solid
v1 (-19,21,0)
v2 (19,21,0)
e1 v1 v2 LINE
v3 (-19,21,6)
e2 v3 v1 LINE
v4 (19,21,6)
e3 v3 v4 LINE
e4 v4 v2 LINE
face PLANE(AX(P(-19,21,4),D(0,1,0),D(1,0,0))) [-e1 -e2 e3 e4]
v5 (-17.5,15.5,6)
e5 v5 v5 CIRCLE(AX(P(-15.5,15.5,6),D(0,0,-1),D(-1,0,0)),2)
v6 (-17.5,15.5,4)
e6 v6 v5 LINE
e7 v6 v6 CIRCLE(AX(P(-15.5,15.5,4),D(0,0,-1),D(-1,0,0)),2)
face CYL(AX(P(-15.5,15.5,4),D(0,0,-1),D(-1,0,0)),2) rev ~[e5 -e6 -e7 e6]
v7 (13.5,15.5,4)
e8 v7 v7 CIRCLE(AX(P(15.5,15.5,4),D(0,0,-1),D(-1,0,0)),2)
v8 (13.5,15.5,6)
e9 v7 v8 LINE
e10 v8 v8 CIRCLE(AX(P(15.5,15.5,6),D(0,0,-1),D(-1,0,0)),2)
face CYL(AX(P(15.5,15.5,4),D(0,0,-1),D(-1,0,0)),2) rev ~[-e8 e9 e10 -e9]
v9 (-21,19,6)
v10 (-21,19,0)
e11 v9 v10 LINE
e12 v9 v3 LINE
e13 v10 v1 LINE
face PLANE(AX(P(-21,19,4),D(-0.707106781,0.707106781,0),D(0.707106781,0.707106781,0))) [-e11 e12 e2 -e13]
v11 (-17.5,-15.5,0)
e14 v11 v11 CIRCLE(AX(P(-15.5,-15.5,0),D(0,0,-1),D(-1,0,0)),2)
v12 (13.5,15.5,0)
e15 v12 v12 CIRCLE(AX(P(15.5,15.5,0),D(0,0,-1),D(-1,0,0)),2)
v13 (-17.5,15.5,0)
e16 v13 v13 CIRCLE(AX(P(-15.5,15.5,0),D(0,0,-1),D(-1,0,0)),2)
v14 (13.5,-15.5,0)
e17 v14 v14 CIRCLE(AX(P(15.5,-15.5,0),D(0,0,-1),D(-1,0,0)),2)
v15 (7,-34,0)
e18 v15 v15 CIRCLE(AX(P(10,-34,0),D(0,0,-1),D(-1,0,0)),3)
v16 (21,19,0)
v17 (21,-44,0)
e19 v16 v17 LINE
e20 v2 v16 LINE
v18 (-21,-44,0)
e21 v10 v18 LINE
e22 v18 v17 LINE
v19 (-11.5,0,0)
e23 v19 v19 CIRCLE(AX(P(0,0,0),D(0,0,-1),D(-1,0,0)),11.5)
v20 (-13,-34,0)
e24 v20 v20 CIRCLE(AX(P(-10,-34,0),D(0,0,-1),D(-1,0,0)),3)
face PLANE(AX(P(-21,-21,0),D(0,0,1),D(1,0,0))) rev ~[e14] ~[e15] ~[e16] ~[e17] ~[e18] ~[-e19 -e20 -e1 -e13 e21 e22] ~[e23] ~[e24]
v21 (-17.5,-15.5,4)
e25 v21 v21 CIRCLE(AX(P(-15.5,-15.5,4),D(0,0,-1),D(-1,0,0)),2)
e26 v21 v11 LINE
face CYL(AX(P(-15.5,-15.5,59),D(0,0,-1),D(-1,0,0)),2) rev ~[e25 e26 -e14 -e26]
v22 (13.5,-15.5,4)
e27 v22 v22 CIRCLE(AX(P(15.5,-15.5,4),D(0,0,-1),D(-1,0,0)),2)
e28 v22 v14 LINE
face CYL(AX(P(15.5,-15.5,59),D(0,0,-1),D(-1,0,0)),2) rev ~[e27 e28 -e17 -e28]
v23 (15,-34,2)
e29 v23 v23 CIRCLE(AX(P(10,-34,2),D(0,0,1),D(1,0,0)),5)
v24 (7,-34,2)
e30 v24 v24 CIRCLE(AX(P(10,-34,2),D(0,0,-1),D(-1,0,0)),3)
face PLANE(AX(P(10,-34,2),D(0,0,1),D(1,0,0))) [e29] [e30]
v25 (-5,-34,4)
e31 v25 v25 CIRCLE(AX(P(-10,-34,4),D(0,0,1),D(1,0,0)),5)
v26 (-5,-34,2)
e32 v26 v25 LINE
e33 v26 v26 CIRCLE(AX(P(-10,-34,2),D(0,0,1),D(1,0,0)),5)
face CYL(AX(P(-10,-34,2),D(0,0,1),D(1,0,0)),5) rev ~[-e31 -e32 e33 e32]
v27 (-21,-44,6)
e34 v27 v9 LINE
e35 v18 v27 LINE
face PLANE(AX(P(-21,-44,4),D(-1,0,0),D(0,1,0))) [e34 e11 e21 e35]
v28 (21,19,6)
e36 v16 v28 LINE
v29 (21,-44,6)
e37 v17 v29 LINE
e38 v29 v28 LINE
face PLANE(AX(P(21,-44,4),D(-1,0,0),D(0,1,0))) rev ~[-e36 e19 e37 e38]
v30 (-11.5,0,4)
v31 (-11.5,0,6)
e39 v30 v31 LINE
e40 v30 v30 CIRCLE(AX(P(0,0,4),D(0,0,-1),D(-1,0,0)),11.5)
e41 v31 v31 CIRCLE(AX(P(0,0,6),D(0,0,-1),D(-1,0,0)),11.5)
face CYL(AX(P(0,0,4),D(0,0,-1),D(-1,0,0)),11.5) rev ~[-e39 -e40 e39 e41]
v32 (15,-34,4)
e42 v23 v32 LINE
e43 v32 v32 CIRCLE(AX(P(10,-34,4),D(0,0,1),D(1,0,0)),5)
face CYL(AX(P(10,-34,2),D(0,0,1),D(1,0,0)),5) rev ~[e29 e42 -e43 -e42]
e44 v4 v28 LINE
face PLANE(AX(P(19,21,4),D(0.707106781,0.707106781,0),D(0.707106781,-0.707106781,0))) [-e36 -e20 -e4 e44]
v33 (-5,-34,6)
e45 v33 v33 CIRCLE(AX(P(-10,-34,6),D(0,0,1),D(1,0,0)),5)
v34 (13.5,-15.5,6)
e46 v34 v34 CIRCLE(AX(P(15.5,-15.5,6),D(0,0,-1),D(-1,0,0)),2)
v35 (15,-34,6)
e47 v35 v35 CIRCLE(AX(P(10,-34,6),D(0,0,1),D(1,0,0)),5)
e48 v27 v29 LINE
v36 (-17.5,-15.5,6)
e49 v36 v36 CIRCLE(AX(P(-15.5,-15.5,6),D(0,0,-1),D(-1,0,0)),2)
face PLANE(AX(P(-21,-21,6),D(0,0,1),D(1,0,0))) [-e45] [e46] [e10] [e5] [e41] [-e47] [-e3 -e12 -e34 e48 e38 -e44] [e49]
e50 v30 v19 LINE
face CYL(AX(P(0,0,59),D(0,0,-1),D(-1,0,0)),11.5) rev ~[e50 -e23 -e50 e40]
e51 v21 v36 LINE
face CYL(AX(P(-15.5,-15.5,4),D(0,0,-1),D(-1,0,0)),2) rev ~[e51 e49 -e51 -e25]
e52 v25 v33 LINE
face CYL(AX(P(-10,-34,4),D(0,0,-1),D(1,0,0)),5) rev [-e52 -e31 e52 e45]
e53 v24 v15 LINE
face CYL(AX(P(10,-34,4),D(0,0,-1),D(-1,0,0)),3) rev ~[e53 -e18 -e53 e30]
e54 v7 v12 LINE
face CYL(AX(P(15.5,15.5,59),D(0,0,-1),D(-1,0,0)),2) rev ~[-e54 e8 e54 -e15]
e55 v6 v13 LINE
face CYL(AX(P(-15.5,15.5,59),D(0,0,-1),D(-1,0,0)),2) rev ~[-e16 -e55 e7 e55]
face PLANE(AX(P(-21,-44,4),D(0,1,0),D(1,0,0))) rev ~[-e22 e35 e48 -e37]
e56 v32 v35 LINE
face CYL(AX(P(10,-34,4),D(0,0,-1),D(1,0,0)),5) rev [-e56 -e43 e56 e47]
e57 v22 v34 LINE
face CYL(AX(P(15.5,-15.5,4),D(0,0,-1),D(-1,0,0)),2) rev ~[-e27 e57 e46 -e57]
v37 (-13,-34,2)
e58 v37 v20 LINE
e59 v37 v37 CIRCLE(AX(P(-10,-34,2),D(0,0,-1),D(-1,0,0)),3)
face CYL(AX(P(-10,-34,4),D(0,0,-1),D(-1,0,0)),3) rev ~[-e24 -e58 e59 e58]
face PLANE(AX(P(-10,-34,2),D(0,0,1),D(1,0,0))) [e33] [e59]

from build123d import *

# Parameters (mm, degrees)
F0_W           = 42
F0_H           = 42
F1_DEPTH       = 4
F3_D           = 4
F3_DEPTH       = 55
F3_TIP         = 1.2017212381
F4_D           = 23
F4_DEPTH       = 55
F4_TIP         = 6.9098971188
F5_DEPTH       = 23
F7_D           = 6
F7_DEPTH       = 55
F7_CBORE_D     = 10
F7_CBORE_DEPTH = 2
F7_TIP         = 1.8025818571
F8_SIZE        = 2
F9_DEPTH       = 2


with BuildPart() as f1:
    # F0 (on Top) → F1 (new body)
    with BuildSketch(Plane.XY):
        Rectangle(F0_W, F0_H)
    extrude(amount=F1_DEPTH)

    # F3
    with Locations(Plane.XY.offset(4)):
        with Locations((-15.5, 15.5), (-15.5, -15.5), (15.5, 15.5), (15.5, -15.5)):
            Hole(F3_D / 2, depth=F3_DEPTH)
            with Locations((0, 0, -(F3_DEPTH + F3_TIP / 2))):  # 118° drill point
                Cone(0, F3_D / 2, F3_TIP, mode=Mode.SUBTRACT)

    # F4
    with Locations(Plane.XY.offset(4)):
        with Locations((0, 0)):
            Hole(F4_D / 2, depth=F4_DEPTH)
            with Locations((0, 0, -(F4_DEPTH + F4_TIP / 2))):  # 118° drill point
                Cone(0, F4_D / 2, F4_TIP, mode=Mode.SUBTRACT)

    # F5 (add): a face of the model
    f5_faces = [f1.faces().sort_by_distance(p)[0] for p in [
        (0, -21, 2),
    ]]
    extrude(f5_faces, amount=F5_DEPTH)

    # F7
    with Locations(Plane.XY.offset(4)):
        with Locations((-10, -34), (10, -34)):
            CounterBoreHole(F7_D / 2, F7_CBORE_D / 2, F7_CBORE_DEPTH, depth=F7_DEPTH)
            with Locations((0, 0, -(F7_DEPTH + F7_TIP / 2))):  # 118° drill point
                Cone(0, F7_D / 2, F7_TIP, mode=Mode.SUBTRACT)

    # F8
    f8_edges = [f1.edges().sort_by_distance(p)[0] for p in [
        (21, 21, 2),
        (-21, 21, 2),
    ]]
    chamfer(f8_edges, length=F8_SIZE)

    # F9 (add): a face of the model
    f9_faces = [f1.faces().sort_by_distance(p)[0] for p in [
        (0, -12.426722897, 4),
    ]]
    extrude(f9_faces, amount=F9_DEPTH)


solid = f1.part
